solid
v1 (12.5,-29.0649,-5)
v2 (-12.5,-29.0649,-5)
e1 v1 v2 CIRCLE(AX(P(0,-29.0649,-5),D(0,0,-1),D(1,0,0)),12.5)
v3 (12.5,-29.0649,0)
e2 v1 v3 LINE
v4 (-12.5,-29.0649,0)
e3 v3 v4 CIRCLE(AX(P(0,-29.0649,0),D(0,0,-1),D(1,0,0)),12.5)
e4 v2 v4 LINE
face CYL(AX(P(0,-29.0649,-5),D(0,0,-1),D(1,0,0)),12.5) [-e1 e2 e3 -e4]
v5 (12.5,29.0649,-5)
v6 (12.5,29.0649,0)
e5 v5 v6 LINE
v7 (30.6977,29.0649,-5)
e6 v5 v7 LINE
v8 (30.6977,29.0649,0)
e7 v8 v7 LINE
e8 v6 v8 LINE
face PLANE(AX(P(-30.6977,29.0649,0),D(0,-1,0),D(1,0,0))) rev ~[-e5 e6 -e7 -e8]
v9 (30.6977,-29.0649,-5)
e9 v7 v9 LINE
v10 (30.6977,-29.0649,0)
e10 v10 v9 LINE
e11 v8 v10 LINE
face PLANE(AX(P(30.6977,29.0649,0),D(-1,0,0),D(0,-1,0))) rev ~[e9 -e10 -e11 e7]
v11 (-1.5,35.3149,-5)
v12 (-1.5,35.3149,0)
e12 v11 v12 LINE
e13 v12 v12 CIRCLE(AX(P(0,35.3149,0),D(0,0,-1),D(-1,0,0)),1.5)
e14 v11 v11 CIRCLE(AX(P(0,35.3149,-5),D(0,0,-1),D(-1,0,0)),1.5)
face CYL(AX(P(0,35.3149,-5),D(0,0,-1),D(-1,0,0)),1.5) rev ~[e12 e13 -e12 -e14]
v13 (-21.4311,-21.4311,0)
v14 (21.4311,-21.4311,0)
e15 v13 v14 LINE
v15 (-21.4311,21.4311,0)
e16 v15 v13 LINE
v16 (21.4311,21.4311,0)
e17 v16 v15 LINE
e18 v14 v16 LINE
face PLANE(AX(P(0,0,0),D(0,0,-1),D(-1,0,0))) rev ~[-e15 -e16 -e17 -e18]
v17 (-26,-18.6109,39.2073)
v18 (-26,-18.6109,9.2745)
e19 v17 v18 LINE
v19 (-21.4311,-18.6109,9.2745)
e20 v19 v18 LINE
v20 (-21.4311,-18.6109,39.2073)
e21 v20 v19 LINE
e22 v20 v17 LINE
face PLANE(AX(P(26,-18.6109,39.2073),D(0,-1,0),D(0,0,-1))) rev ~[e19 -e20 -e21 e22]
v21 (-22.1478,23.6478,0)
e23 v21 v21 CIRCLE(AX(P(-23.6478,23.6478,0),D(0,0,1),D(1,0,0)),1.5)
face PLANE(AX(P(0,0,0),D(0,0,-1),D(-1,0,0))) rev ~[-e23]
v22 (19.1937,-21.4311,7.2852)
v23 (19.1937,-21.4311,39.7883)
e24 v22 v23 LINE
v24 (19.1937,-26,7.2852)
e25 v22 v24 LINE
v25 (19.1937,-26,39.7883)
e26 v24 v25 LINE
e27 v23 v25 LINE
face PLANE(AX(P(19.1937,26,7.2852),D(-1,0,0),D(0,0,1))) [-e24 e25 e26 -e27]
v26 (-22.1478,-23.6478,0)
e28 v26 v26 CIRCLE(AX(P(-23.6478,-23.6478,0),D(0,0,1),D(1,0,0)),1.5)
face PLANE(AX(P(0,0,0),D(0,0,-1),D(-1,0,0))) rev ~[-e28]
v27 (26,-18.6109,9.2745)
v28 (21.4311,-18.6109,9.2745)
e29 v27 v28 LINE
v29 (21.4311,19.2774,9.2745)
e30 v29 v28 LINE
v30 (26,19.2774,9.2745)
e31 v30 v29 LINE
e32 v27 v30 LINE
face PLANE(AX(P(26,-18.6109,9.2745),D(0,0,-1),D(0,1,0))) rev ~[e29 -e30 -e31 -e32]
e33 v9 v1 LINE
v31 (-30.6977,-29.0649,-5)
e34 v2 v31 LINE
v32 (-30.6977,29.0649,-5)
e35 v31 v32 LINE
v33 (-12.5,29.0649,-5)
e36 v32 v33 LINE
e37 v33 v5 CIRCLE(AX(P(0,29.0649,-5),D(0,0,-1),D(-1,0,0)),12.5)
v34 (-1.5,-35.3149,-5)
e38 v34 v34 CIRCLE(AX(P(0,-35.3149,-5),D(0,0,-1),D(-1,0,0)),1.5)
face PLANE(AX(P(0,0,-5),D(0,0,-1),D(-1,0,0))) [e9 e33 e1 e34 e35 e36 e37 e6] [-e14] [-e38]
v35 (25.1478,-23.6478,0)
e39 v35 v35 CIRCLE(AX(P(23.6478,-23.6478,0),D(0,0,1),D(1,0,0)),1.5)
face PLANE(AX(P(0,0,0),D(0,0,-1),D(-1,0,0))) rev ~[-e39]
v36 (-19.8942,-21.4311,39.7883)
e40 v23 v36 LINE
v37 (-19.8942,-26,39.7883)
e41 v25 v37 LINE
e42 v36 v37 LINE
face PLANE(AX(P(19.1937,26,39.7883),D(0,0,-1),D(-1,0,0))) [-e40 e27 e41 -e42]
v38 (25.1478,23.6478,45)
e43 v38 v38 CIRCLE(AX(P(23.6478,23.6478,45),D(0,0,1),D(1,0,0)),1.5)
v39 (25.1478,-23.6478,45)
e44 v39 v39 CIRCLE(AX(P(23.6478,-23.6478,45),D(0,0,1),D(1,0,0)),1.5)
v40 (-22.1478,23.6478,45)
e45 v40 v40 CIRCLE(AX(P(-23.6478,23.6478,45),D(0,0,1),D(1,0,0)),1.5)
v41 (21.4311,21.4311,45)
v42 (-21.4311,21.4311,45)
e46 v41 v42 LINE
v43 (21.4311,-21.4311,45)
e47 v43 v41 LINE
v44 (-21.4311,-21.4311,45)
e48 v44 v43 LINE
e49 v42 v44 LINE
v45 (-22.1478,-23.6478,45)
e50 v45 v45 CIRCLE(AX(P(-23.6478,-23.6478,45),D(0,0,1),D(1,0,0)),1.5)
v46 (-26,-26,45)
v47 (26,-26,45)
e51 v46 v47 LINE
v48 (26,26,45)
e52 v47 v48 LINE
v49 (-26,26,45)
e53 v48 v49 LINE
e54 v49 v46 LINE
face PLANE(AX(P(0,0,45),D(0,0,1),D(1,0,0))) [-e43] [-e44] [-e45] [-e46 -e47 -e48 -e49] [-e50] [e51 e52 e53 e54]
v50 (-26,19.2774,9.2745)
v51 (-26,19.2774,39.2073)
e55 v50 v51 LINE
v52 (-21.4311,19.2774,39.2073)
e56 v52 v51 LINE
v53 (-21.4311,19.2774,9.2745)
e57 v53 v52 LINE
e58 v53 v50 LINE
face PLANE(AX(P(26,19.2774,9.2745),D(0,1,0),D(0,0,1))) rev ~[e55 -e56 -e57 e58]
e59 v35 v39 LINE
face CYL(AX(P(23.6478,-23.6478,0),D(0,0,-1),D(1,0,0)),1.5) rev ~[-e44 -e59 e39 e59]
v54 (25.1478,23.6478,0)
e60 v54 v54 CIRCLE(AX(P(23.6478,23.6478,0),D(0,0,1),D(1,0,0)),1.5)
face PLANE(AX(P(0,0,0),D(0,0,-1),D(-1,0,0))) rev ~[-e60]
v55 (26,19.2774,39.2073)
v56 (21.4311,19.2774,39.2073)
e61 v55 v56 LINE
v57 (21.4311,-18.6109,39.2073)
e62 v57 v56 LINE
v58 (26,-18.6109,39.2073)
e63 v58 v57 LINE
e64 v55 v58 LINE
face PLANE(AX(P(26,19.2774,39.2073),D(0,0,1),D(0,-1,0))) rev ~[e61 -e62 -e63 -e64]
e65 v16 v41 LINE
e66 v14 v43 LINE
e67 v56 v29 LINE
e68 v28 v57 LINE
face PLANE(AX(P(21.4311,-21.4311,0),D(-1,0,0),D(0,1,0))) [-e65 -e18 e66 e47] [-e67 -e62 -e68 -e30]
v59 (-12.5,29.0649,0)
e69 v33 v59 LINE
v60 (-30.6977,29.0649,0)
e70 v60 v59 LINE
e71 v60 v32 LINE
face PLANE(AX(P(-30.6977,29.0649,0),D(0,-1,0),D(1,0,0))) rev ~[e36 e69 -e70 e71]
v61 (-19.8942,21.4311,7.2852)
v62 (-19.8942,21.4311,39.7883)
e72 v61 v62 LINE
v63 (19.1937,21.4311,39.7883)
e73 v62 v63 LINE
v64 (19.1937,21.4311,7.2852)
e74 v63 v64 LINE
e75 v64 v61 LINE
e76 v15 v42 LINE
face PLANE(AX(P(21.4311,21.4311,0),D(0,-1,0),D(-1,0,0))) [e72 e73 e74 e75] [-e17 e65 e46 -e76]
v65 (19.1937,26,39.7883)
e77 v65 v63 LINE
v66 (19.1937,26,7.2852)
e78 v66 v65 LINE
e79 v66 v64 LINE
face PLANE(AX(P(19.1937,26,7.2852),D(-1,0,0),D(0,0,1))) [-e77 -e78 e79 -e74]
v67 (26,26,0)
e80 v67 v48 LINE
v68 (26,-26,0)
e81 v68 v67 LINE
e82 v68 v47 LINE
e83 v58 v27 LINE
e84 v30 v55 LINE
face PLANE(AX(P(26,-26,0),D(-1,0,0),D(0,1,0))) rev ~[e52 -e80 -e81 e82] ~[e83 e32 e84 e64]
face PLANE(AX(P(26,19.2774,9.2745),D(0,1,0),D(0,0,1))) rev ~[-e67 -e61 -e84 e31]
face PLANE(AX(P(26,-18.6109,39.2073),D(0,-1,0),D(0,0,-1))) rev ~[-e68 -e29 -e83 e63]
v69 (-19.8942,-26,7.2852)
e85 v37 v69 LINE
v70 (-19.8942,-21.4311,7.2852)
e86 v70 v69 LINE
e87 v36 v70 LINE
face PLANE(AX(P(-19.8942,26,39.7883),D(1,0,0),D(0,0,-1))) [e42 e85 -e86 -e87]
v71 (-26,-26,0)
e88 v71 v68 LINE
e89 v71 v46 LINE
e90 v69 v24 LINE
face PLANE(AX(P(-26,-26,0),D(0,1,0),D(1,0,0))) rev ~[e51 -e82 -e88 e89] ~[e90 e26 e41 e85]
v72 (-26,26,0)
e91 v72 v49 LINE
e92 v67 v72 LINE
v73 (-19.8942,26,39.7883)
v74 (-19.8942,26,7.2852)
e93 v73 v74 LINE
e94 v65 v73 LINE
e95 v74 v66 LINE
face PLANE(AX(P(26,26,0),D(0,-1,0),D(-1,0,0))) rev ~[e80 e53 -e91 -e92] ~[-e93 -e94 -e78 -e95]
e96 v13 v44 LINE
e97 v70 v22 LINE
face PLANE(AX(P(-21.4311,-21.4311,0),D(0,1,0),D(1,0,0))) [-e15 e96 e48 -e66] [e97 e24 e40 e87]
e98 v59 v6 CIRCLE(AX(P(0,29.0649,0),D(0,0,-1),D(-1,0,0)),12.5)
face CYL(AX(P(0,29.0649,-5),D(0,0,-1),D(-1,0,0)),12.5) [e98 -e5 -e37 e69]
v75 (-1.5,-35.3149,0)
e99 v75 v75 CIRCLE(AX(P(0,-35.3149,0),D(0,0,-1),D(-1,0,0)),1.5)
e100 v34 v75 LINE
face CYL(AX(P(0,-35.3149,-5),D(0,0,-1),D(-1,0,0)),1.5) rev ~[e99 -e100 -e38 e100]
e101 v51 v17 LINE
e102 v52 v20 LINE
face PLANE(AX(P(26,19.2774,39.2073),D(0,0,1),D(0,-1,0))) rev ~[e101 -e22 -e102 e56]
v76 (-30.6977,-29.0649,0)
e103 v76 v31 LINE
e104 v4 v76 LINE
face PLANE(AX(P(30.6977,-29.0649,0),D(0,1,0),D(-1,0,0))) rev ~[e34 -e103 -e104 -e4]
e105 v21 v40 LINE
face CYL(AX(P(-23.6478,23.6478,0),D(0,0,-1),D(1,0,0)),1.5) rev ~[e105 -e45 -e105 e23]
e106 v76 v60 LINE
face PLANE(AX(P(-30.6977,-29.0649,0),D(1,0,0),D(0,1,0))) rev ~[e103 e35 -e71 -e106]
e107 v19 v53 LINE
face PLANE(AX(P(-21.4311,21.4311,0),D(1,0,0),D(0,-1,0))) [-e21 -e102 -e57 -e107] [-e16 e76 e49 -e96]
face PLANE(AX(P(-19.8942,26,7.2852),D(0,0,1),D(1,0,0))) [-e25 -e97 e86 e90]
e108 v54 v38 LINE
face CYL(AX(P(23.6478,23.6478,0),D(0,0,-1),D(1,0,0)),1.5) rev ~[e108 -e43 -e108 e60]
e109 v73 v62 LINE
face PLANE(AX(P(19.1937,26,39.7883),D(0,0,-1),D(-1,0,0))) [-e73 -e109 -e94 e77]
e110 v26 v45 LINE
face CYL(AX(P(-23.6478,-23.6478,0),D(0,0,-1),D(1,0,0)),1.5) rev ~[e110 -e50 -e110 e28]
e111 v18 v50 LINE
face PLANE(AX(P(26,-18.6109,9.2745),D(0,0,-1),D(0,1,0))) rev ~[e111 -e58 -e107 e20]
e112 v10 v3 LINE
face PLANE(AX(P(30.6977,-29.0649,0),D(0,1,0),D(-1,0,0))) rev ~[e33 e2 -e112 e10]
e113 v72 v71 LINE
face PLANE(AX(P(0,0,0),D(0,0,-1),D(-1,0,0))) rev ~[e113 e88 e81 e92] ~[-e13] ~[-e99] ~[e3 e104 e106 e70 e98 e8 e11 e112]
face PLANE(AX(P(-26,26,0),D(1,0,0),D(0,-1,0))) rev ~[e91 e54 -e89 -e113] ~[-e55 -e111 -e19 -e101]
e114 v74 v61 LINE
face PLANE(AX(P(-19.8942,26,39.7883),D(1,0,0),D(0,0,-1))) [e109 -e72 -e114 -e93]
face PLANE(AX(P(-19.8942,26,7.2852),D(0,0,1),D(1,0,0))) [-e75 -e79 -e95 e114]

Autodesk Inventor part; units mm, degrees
ref_plane "YZ Plane" through (0, 0, 0) normal (1, 0, 0) x (0, 1, 0)
ref_plane "XZ Plane" through (0, 0, 0) normal (0, 1, 0) x (-1, 0, 0)
ref_plane "XY Plane" through (0, 0, 0) normal (0, 0, 1) x (1, 0, 0)
sketch "Boceto1" plane through (0, 0, 0) normal (0, 0, 1) x (1, 0, 0)
  line L0 (-26, -26) -> (26, -26)
  line L1 (26, -26) -> (26, 26)
  line L2 (26, 26) -> (-26, 26)
  line L3 (-26, 26) -> (-26, -26)
  line L4 (-26, -26) -> (26, 26) construction
  line L5 (26, -26) -> (-26, 26) construction
  circle A0 centre (-23.6478, 23.6478) radius 1.5
  circle A1 centre (23.6478, 23.6478) radius 1.5
  circle A2 centre (23.6478, -23.6478) radius 1.5
  line L6 (-21.4311, -21.4311) -> (21.4311, -21.4311)
  line L7 (21.4311, -21.4311) -> (21.4311, 21.4311)
  line L8 (21.4311, 21.4311) -> (-21.4311, 21.4311)
  line L9 (-21.4311, 21.4311) -> (-21.4311, -21.4311)
  line L10 (-21.4311, -21.4311) -> (21.4311, 21.4311) construction
  line L11 (21.4311, -21.4311) -> (-21.4311, 21.4311) construction
  circle A3 centre (-23.6478, -23.6478) radius 1.5
  point P0 (0, 0)
  dimension "d0" = 52
  dimension "d1" = 52
  dimension "d2" = 3
  dimension "d3" = 3
  dimension "d4" = 3
  dimension "d6" = 3
extrude "Extrusión1" add sketch "Boceto1" along normal blind 45
sketch "Boceto2" plane through (0, 0, 0) normal (0, 0, -1) x (-1, 0, 0)
  line L0 (30.6977, 29.0649) -> (-30.6977, 29.0649)
  line L1 (-30.6977, 29.0649) -> (-30.6977, -29.0649)
  line L2 (-30.6977, -29.0649) -> (30.6977, -29.0649)
  line L3 (30.6977, -29.0649) -> (30.6977, 29.0649)
  line L4 (30.6977, 29.0649) -> (-30.6977, -29.0649) construction
  line L5 (-30.6977, 29.0649) -> (30.6977, -29.0649) construction
  point P0 (0, 0)
extrude "Extrusión2" add sketch "Boceto2" along normal blind 5
thread "Rosca1" size "M3x0.5" class "6H" standard "ANSI Metric M Profile" length 5
thread "Rosca2" size "M3x0.5" class "6H" standard "ANSI Metric M Profile" length 5
thread "Rosca3" size "M3x0.5" class "6H" standard "ANSI Metric M Profile" length 5
thread "Rosca4" size "M3x0.5" class "6H" standard "ANSI Metric M Profile" length 5
sketch "Boceto3" plane through (0, 0, -5) normal (0, 0, -1) x (-1, 0, 0)
  line L0 (-30.6977, -29.0649) -> (30.6977, -29.0649) projected
  arc A0 (-12.5, -29.0649) -> (12.5, -29.0649) centre (0, -29.0649) ccw
  line L1 (30.6977, 29.0649) -> (-30.6977, 29.0649) projected
  arc A1 (12.5, 29.0649) -> (-12.5, 29.0649) centre (0, 29.0649) ccw
  circle A2 centre (0, -35.3149) radius 1.5
  circle A3 centre (0, 35.3149) radius 1.5
  point P0 (0, 0)
  dimension "d19" = 25
  dimension "d20" = 25
  dimension "d21" = 3
  dimension "d22" = 3
extrude "Extrusión3" add sketch "Boceto3" against normal blind 5
thread "Rosca5" size "M3x0.5" class "6H" standard "ANSI Metric M Profile" length 5
thread "Rosca6" size "M3x0.5" class "6H" standard "ANSI Metric M Profile" length 5
sketch "Boceto4" plane through (26, -26, 45) normal (1, 0, 0) x (0, 0, -1)
  line L0 (5.7927, 7.3891) -> (35.7255, 7.3891)
  line L1 (35.7255, 7.3891) -> (35.7255, 45.2774)
  line L2 (35.7255, 45.2774) -> (5.7927, 45.2774)
  line L3 (5.7927, 45.2774) -> (5.7927, 7.3891)
  point P0 (45, 26)
extrude "Extrusión4" cut sketch "Boceto4" against normal blind 66
sketch "Boceto5" plane through (-26, 26, 45) normal (0, 1, 0) x (1, 0, 0)
  line L0 (45.1937, 5.2117) -> (6.1058, 5.2117)
  line L1 (6.1058, 5.2117) -> (6.1058, 37.7148)
  line L2 (6.1058, 37.7148) -> (45.1937, 37.7148)
  line L3 (45.1937, 37.7148) -> (45.1937, 5.2117)
  point P0 (26, 45)
extrude "Extrusión5" cut sketch "Boceto5" against normal blind 66
properties part number "Base para Driver Corregida"
